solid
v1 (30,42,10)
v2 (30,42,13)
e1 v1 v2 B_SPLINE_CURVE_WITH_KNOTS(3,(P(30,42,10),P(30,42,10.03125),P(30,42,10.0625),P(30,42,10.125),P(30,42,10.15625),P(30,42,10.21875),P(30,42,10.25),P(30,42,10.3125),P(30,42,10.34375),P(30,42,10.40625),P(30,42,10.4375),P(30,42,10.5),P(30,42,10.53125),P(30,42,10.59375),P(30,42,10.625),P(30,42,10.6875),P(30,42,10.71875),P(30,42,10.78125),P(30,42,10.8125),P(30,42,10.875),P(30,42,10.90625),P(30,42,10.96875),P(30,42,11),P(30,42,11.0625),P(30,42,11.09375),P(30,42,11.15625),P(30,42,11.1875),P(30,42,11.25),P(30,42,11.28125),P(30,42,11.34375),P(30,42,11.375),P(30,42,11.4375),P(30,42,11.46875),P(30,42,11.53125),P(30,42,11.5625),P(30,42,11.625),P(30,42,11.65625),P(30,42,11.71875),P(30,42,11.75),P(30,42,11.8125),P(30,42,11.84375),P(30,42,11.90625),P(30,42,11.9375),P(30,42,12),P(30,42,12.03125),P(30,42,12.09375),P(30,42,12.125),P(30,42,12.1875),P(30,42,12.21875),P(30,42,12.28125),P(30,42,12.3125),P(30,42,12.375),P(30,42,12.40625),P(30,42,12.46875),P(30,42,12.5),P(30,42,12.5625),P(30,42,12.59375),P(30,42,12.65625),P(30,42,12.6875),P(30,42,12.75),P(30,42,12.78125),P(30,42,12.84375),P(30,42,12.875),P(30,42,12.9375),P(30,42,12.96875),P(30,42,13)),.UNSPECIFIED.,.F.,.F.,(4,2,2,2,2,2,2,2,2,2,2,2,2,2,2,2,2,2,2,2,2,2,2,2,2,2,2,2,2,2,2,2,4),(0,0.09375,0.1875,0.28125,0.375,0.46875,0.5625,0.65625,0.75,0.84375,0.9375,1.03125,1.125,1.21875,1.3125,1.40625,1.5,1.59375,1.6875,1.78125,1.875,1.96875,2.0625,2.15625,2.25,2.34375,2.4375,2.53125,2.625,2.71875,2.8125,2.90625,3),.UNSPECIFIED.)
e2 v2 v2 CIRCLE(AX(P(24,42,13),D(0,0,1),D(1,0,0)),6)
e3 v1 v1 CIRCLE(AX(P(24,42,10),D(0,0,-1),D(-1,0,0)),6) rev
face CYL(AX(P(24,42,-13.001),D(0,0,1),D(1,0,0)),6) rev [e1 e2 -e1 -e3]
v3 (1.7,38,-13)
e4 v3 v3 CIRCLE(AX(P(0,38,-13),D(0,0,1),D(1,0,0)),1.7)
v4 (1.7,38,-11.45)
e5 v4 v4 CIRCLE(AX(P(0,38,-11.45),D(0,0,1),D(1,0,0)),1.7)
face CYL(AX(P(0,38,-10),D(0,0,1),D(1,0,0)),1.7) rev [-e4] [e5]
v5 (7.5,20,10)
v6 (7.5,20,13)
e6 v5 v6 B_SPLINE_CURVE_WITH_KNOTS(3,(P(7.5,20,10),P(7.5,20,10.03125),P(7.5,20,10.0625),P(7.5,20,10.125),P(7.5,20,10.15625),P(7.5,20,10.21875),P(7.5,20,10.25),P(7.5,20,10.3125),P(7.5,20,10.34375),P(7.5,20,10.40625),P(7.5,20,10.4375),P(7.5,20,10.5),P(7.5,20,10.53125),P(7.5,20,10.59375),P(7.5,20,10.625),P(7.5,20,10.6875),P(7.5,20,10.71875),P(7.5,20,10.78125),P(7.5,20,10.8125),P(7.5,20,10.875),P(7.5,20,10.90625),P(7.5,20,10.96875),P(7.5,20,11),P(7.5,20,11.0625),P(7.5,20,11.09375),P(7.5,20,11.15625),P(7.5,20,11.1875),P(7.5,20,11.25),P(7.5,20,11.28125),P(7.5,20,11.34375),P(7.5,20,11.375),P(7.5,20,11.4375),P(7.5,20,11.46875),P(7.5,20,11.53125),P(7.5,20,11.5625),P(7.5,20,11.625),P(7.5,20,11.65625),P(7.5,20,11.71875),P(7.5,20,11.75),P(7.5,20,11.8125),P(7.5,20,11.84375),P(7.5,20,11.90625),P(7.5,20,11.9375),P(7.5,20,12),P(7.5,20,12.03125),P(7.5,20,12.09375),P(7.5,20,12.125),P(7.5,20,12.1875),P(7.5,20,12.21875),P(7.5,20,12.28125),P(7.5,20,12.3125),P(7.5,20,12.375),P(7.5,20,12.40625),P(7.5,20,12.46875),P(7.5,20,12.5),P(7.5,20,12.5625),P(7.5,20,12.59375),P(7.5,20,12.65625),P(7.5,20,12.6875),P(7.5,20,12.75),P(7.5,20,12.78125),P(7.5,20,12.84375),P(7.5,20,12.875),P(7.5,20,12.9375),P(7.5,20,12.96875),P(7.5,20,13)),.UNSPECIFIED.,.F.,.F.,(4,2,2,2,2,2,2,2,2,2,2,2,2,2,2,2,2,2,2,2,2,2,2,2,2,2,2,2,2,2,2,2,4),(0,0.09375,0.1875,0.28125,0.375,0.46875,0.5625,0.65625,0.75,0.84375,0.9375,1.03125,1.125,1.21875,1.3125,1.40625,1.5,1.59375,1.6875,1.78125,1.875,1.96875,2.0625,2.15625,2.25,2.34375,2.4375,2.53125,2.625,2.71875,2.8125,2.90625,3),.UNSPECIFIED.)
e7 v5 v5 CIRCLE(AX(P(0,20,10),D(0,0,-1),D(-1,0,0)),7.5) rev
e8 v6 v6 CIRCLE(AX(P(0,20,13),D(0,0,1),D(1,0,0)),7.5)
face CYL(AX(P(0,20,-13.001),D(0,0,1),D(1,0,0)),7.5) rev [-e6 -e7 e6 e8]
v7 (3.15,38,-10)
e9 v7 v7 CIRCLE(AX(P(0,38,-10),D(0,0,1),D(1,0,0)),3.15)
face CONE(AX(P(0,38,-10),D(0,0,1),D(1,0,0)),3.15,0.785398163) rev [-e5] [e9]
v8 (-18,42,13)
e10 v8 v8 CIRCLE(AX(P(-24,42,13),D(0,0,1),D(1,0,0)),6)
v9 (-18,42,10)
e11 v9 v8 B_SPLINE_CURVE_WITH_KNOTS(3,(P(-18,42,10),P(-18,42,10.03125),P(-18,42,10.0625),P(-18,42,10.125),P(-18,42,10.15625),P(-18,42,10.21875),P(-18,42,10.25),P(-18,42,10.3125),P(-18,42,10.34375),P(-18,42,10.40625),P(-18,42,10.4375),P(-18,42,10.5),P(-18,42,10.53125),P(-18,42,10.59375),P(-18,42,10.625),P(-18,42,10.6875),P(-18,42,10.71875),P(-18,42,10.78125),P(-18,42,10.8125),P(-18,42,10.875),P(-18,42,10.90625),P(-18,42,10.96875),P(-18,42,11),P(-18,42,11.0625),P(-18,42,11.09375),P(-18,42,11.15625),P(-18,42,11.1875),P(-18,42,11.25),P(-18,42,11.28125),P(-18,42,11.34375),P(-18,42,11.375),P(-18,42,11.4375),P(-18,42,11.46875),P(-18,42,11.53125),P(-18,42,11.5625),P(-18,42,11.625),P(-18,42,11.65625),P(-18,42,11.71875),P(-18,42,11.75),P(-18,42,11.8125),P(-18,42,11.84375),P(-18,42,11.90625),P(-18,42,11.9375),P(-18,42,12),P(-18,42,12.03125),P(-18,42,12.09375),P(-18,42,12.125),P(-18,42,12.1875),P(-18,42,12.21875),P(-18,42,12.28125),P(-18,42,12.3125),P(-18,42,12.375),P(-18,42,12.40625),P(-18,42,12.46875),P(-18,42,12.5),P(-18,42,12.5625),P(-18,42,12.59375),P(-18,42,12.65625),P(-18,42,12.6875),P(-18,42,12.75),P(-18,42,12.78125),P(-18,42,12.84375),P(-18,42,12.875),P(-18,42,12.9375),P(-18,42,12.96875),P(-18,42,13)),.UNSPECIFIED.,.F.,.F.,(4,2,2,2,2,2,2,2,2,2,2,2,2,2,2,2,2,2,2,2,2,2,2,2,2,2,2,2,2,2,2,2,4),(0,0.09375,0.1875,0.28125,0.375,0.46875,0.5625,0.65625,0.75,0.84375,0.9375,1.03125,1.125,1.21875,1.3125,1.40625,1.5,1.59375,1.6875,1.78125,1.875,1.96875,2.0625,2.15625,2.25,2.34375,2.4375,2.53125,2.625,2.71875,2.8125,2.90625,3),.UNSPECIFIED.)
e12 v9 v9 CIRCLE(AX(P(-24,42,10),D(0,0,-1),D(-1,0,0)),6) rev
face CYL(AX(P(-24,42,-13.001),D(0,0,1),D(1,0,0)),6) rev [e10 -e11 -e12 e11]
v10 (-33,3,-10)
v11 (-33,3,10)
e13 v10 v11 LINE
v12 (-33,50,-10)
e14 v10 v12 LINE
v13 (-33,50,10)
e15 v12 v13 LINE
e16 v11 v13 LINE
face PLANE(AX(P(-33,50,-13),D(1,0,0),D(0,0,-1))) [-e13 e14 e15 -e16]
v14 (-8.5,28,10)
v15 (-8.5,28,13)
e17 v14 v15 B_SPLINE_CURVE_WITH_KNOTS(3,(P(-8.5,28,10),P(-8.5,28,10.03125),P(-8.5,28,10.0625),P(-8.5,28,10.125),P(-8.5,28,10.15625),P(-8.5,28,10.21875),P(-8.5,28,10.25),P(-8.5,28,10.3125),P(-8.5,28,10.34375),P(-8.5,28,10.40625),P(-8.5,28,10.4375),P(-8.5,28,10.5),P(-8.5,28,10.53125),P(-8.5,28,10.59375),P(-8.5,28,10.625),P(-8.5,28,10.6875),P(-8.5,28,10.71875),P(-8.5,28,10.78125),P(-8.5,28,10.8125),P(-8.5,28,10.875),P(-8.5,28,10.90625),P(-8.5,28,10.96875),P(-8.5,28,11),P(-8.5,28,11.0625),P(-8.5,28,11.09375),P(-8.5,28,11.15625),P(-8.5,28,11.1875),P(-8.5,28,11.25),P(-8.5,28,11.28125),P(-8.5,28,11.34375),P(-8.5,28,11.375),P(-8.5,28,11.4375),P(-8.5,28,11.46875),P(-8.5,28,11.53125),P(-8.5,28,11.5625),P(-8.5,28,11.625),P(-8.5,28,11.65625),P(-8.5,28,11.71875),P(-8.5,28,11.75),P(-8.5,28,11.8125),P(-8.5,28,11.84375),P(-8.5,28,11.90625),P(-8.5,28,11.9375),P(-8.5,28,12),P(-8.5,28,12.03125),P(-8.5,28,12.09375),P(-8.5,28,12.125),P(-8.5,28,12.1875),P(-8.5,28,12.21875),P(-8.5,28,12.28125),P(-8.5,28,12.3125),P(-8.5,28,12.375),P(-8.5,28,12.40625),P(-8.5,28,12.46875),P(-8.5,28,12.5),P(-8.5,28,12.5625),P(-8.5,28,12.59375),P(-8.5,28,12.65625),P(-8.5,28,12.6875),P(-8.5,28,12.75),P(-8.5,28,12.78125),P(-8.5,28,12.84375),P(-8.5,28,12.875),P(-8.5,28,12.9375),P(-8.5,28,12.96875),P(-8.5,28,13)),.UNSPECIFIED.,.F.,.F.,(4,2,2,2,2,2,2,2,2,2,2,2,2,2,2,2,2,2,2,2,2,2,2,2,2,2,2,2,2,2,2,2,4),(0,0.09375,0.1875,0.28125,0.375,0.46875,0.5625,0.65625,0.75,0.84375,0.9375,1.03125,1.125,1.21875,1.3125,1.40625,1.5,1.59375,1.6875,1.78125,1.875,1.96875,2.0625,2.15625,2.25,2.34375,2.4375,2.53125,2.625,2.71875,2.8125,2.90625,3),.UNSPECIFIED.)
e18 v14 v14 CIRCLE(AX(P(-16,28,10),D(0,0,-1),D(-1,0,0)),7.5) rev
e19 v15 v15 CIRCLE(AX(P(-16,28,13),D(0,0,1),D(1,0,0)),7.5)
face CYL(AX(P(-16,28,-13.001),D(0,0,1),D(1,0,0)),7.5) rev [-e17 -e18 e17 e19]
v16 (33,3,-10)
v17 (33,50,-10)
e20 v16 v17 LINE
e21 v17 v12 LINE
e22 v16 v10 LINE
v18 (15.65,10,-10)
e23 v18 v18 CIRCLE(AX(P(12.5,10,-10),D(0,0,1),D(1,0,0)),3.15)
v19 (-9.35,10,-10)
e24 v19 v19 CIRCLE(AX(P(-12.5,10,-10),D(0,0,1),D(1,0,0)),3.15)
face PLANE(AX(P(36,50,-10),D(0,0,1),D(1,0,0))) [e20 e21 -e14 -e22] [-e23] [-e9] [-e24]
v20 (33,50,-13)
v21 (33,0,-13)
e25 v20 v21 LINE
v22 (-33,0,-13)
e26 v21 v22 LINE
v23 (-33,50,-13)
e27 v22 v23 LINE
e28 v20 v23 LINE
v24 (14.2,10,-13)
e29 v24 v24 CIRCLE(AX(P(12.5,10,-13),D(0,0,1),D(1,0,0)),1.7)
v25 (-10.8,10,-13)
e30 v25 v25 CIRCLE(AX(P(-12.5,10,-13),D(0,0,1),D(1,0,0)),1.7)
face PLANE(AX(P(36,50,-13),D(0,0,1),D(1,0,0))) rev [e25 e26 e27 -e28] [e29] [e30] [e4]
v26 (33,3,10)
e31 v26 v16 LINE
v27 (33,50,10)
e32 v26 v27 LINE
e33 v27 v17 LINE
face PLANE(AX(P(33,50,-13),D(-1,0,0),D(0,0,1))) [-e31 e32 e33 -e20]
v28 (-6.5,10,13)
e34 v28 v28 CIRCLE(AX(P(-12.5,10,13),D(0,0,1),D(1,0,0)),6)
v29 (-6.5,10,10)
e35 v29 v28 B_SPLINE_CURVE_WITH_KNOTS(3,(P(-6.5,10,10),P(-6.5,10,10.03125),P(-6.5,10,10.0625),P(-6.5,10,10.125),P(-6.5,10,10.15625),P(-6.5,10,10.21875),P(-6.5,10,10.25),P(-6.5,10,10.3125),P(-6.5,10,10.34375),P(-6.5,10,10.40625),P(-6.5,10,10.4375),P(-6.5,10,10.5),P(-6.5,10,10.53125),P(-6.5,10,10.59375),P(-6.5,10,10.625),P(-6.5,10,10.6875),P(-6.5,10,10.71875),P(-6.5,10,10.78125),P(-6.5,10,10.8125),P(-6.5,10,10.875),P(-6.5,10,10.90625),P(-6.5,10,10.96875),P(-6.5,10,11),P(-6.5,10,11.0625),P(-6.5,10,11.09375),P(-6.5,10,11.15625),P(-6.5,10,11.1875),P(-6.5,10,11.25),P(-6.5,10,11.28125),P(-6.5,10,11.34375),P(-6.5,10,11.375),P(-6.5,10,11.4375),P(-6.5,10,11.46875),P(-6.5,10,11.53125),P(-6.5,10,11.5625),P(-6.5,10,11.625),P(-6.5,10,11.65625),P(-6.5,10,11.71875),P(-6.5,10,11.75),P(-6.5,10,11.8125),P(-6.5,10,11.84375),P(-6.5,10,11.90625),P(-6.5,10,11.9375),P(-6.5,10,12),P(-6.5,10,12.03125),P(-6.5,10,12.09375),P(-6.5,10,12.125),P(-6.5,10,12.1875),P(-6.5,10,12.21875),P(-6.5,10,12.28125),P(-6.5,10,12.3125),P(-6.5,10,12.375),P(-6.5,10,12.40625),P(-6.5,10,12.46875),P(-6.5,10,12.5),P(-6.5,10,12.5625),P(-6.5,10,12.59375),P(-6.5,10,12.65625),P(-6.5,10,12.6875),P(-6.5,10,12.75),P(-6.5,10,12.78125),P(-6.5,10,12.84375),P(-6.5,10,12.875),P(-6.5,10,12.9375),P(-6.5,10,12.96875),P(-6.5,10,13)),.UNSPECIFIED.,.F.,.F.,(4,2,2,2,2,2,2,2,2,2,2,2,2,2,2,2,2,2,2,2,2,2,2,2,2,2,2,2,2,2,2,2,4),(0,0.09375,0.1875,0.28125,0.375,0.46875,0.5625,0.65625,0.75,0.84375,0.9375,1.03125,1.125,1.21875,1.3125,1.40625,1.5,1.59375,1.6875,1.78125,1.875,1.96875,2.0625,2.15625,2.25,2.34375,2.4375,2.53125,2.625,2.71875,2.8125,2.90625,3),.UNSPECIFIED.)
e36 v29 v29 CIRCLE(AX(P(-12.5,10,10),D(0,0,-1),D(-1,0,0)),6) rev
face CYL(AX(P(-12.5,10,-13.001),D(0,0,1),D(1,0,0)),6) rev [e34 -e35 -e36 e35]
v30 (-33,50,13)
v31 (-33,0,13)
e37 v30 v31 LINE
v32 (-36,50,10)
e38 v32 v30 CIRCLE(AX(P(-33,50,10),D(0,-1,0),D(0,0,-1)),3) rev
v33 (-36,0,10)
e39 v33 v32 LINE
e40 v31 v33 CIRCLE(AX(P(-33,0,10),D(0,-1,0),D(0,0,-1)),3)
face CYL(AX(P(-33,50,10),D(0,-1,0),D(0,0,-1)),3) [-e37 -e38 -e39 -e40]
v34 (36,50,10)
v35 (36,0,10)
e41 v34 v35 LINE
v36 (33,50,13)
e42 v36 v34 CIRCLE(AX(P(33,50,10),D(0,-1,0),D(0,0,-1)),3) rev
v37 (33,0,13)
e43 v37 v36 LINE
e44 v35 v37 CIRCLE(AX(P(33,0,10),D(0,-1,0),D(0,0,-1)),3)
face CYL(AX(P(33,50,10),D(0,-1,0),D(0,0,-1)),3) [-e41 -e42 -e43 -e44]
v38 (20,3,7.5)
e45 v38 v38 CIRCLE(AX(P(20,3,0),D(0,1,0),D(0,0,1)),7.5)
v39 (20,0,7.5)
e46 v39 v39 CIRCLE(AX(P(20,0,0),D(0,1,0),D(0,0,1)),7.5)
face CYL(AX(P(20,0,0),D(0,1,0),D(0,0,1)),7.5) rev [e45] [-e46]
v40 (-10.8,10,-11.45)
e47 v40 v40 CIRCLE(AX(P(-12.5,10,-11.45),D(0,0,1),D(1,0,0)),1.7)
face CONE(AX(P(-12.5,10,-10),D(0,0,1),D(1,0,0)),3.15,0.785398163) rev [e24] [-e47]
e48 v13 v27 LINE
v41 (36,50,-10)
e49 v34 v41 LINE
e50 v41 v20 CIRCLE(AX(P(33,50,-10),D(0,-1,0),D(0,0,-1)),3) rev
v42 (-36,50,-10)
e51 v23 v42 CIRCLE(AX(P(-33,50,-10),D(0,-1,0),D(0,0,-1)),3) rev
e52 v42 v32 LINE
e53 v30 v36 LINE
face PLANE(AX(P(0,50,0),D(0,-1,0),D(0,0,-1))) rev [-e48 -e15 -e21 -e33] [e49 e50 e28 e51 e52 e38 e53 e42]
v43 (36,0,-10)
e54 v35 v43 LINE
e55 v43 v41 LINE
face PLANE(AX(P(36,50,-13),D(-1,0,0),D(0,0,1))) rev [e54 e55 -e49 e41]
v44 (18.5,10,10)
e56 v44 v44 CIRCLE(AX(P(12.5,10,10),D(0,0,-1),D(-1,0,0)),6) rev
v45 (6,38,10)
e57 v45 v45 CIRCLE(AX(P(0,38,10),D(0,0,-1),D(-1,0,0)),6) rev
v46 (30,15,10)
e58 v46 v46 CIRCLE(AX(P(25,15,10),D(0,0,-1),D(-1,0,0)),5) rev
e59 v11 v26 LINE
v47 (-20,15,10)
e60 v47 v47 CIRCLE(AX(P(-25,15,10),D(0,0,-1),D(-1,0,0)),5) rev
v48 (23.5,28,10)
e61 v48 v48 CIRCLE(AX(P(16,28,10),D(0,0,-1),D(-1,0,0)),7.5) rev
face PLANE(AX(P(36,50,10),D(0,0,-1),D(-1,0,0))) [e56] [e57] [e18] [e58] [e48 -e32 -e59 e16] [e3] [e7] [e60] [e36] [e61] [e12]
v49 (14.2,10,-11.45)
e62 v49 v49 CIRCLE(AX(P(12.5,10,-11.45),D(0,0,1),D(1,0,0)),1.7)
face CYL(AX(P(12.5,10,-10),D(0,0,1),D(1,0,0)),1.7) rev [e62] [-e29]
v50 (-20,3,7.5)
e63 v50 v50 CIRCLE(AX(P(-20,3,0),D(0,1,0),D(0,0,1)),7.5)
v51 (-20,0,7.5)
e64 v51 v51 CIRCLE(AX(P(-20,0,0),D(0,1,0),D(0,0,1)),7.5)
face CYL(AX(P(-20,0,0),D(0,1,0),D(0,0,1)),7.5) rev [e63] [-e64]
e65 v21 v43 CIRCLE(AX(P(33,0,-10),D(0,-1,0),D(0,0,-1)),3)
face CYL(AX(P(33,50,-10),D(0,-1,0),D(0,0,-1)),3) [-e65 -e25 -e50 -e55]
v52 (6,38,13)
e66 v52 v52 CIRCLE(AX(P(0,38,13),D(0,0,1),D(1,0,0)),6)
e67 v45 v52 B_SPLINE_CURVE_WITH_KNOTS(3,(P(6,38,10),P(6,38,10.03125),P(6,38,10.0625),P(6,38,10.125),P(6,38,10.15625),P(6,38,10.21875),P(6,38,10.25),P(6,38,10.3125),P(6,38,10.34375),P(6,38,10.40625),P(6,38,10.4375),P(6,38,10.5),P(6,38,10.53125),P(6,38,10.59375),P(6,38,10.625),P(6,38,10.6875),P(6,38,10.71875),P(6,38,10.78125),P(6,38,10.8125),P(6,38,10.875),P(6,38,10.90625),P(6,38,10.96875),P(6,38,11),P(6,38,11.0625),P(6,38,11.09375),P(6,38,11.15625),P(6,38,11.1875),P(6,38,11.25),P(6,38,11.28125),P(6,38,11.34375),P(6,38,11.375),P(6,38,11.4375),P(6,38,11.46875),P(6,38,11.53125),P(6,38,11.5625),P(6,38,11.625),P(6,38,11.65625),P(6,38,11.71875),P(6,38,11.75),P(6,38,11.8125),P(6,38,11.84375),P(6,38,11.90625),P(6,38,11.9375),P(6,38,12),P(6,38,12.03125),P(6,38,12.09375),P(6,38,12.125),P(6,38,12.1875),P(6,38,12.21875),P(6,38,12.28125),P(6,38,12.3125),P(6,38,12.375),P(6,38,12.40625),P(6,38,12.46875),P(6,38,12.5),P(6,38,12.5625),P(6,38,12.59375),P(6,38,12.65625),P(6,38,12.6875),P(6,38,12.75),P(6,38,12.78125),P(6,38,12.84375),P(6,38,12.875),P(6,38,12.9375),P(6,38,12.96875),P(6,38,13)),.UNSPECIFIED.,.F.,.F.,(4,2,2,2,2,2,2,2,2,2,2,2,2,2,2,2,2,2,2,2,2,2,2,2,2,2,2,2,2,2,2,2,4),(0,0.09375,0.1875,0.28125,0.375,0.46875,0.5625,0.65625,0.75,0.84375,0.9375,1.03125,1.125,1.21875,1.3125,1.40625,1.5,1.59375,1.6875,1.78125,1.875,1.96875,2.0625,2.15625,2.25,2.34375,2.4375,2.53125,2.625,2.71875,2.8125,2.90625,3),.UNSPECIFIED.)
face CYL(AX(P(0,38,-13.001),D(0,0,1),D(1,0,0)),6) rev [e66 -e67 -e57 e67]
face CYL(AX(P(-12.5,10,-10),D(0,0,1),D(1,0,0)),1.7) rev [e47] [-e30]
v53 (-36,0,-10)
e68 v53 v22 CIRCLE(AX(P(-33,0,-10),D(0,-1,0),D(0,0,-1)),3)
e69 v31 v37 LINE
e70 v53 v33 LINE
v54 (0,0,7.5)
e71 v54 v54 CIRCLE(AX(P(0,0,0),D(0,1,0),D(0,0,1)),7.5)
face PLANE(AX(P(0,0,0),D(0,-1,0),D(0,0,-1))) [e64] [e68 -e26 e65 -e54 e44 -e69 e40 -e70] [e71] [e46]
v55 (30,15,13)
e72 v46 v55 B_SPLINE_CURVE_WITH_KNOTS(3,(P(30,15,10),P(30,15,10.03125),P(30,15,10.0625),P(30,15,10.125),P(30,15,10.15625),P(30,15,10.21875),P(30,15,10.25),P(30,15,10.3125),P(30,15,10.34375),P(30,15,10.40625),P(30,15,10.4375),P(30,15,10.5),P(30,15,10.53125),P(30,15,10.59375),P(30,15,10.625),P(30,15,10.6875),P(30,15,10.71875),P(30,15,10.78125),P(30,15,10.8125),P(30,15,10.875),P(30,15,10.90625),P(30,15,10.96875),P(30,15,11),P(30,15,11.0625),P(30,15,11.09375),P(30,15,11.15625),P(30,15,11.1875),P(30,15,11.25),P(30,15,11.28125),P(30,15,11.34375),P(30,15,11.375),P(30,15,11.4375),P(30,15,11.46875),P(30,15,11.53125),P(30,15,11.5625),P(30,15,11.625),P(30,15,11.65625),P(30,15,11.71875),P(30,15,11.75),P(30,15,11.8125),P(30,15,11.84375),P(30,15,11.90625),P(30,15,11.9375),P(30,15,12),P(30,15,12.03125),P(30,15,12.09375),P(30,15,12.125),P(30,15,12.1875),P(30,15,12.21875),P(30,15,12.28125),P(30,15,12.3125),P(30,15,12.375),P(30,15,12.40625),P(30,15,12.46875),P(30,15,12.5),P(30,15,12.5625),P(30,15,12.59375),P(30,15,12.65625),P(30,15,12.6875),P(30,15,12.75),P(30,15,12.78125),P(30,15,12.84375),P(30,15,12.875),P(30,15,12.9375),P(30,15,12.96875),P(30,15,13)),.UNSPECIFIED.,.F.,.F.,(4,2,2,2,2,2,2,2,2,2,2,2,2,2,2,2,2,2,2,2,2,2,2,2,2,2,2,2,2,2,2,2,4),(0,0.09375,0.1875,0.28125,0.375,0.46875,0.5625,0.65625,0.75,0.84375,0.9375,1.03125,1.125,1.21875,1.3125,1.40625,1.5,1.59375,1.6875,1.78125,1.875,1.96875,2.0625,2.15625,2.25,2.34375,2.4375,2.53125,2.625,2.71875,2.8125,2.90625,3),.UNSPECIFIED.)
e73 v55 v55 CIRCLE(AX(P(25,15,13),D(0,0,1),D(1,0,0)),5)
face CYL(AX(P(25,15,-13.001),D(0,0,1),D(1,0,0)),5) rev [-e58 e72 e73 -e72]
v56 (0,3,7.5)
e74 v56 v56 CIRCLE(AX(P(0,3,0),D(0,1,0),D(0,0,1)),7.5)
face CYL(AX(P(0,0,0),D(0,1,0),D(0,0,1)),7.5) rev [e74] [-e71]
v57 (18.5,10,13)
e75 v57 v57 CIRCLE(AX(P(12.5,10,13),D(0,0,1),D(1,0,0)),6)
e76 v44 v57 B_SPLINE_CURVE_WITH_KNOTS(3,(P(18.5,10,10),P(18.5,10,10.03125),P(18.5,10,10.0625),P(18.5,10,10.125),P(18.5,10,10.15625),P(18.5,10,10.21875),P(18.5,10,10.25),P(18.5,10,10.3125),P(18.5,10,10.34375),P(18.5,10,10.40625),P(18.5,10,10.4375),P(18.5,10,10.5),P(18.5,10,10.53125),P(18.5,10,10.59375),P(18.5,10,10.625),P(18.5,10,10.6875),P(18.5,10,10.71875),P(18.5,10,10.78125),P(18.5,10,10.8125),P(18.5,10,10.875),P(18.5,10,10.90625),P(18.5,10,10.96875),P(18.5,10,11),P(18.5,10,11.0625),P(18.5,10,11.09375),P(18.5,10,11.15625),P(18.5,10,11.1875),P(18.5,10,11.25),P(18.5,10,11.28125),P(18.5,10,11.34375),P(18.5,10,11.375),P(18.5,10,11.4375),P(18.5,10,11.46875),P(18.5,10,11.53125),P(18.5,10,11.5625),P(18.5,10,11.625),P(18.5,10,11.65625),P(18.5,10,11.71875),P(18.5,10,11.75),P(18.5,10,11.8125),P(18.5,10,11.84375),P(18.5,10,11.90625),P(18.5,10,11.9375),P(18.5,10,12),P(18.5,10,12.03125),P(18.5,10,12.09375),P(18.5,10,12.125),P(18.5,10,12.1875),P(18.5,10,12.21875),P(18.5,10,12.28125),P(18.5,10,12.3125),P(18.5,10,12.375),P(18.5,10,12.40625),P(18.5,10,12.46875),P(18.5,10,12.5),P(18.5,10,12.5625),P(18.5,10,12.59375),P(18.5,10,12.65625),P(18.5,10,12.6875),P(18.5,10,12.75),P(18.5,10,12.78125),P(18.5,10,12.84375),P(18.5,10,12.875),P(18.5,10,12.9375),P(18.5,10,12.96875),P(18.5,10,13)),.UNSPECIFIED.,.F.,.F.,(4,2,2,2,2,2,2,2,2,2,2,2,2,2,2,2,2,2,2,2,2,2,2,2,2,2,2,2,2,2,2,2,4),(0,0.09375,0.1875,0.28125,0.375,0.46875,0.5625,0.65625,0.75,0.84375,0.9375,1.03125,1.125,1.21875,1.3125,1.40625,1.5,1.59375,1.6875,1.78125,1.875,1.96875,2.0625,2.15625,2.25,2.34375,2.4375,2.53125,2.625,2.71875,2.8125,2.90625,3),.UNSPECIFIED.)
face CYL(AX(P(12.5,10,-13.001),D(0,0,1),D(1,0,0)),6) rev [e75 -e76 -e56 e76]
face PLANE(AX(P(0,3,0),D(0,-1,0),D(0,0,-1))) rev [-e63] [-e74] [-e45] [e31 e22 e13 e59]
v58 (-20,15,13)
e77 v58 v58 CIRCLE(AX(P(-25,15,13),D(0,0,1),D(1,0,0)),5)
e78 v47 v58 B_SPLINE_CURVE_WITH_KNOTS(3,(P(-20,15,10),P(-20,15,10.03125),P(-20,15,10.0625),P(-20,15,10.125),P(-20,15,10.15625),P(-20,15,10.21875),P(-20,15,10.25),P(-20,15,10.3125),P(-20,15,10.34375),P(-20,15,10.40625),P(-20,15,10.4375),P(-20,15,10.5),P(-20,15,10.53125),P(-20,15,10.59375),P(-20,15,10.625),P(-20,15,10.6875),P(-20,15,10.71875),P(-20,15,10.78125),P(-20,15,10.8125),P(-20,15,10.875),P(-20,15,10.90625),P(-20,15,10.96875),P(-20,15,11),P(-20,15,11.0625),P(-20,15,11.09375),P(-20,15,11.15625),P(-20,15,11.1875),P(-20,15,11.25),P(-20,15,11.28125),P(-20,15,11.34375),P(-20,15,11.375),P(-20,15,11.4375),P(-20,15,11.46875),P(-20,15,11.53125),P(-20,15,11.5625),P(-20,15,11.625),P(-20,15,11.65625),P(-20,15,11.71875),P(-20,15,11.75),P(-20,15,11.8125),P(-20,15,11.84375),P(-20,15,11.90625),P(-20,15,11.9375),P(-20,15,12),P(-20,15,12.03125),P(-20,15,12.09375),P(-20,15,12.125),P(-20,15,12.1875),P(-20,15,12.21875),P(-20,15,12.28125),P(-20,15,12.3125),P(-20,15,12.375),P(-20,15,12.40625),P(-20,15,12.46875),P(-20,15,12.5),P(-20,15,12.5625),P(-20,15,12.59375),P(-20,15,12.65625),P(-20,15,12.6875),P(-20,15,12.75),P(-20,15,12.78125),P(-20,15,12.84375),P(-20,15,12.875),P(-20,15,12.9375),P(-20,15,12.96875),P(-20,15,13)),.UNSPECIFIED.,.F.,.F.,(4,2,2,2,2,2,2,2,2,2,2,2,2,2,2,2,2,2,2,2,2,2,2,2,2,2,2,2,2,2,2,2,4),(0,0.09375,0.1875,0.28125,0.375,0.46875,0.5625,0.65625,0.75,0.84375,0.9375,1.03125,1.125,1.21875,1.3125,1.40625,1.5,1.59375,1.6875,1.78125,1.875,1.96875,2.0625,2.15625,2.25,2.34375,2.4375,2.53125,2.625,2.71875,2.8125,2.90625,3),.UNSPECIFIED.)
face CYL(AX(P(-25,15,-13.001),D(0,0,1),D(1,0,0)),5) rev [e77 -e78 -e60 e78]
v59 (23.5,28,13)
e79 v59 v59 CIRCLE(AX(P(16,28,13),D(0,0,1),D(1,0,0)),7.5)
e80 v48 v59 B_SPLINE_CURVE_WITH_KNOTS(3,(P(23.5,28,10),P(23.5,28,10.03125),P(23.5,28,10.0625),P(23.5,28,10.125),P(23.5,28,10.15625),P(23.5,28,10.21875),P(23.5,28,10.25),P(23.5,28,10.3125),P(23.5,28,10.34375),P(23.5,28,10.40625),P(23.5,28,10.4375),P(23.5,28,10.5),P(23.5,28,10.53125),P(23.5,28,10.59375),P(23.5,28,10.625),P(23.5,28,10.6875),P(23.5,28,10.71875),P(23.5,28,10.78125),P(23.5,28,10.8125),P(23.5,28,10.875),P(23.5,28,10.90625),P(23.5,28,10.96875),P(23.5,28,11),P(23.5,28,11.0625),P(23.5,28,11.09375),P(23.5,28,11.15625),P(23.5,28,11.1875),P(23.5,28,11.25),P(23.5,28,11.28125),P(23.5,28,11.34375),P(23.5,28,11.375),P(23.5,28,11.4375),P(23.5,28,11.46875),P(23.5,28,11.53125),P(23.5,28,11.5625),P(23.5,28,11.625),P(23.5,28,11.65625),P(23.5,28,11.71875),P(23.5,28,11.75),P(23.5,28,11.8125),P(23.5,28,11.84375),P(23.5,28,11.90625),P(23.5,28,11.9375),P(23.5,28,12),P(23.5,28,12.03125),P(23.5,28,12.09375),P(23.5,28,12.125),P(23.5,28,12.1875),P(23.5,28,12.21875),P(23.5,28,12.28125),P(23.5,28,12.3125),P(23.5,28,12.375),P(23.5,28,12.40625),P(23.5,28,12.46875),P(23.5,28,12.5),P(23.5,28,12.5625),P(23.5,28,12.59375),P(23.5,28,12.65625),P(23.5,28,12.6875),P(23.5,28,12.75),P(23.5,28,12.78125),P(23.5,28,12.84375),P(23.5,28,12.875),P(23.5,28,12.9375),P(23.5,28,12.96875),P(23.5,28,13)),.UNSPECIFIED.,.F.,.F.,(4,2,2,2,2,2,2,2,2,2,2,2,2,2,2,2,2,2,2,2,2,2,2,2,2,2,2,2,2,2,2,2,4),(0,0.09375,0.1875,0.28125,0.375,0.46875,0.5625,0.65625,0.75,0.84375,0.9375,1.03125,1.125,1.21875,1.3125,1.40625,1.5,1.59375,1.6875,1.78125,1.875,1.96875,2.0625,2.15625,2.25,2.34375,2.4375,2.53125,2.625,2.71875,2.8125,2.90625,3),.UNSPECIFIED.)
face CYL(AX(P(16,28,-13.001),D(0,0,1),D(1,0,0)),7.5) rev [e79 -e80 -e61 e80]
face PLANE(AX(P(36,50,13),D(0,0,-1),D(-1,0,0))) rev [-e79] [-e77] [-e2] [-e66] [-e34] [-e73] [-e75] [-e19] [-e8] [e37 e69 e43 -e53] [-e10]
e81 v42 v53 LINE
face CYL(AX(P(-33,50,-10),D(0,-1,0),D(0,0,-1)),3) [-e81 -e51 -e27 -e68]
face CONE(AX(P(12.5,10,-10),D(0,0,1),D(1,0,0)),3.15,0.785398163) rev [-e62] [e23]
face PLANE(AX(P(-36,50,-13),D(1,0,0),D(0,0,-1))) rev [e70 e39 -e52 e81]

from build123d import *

# Parameters (mm, degrees)
SKETCH1_W                                    = 72
SKETCH1_H                                    = 26
BOSS_EXTRUDE1_DEPTH                          = 50
FILLET1_R                                    = 3
SHELL1_START                                 = -33
SHELL1_OUTLINE_W                             = 47
SHELL1_OUTLINE_H                             = 20
SHELL1_DEPTH                                 = 66
SKETCH2_R                                    = 7.5
CUT_EXTRUDE1_DEPTH                           = 61.613529843
CSK_FOR_M3_COUNTERSUNK_FLAT_HEAD_SCR_2_COUNT = 2
CSK_FOR_M3_COUNTERSUNK_FLAT_HEAD_SCR_2_PITCH = 30.663496213
CSK_FOR_M3_COUNTERSUNK_FLAT_HEAD_SCR_3_COUNT = 2
CSK_FOR_M3_COUNTERSUNK_FLAT_HEAD_SCR_3_PITCH = 30.663496213
CUT_EXTRUDE2_REACH                           = 68.873
SKETCH6_R                                    = 6
SKETCH6_R_2                                  = 7.5
SKETCH6_R_3                                  = 5


# Read off the part's stored shape, not the designer's step: Shell1
with BuildPart() as part:
    # Sketch1 → Boss-Extrude1 (new body)
    with BuildSketch(Plane(origin=(0, 0, 0), x_dir=(1, 0, 0), z_dir=(0, 1, 0))):
        Rectangle(SKETCH1_W, SKETCH1_H)
    extrude(amount=BOSS_EXTRUDE1_DEPTH)

    # Fillet1
    fillet1_edges = [part.edges().sort_by_distance(p)[0] for p in [
        (-36, 25, -13),
        (36, 25, -13),
        (36, 25, 13),
        (-36, 25, 13),
    ]]
    fillet(fillet1_edges, radius=FILLET1_R)

    # Shell1 outline → Shell1 (cut)
    with BuildSketch(Plane.YZ.offset(SHELL1_START)):
        with Locations((26.5, 0)):
            Rectangle(SHELL1_OUTLINE_W, SHELL1_OUTLINE_H)
    extrude(amount=SHELL1_DEPTH, mode=Mode.SUBTRACT)

    # Sketch2 → Cut-Extrude1 (cut, through all)
    with BuildSketch(Plane(origin=(0, 3, 0), x_dir=(1, 0, 0), z_dir=(0, 1, 0))):
        with Locations(Location((0, 0, 0), (0, 0, 270))):
            Circle(SKETCH2_R)
        with Locations(Location((-20, 0, 0), (0, 0, 270))):
            Circle(SKETCH2_R)
        with Locations(Location((20, 0, 0), (0, 0, 270))):
            Circle(SKETCH2_R)
    extrude(amount=-CUT_EXTRUDE1_DEPTH, mode=Mode.SUBTRACT)

    # Sketch4 → CSK for M3 Countersunk Flat Head Screw1 (revolve, cut)
    with BuildSketch(Plane(origin=(0, 38, -10), x_dir=(0, -1, 0), z_dir=(1, 0, 0))):
        Polygon((0, 0), (0, 3), (1.7, 3), (1.7, 1.45), (3.15, 0), align=None)
    csk_for_m3_countersunk_flat_head_screw1 = revolve(axis=Axis((0, 38, -3.65), (0, 0, -1)), mode=Mode.SUBTRACT)

    # CSK for M3 Countersunk Flat Head Scr 2: CSK for M3 Countersunk Flat Head Screw1 ×2
    with Locations(*[Vector(-0.4076508403738889, -0.9131378824375114, 0) * (i * CSK_FOR_M3_COUNTERSUNK_FLAT_HEAD_SCR_2_PITCH) for i in range(1, CSK_FOR_M3_COUNTERSUNK_FLAT_HEAD_SCR_2_COUNT)]):
        add(csk_for_m3_countersunk_flat_head_screw1, mode=Mode.SUBTRACT)

    # CSK for M3 Countersunk Flat Head Scr 3: CSK for M3 Countersunk Flat Head Screw1 ×2
    with Locations(*[Vector(0.4076508403738889, -0.9131378824375114, 0) * (i * CSK_FOR_M3_COUNTERSUNK_FLAT_HEAD_SCR_3_PITCH) for i in range(1, CSK_FOR_M3_COUNTERSUNK_FLAT_HEAD_SCR_3_COUNT)]):
        add(csk_for_m3_countersunk_flat_head_screw1, mode=Mode.SUBTRACT)

    # Sketch6 → Cut-Extrude2 (cut, up to next)
    with BuildSketch(Plane.XY.offset(13), mode=Mode.PRIVATE) as cut_extrude2_sk1:
        with Locations((0, 38)):
            Circle(SKETCH6_R)
    cut_extrude2_tool1 = extrude(cut_extrude2_sk1.sketch, amount=-CUT_EXTRUDE2_REACH, mode=Mode.PRIVATE) & part.part
    # Sketch6 → Cut-Extrude2 (cut, up to next)
    with BuildSketch(Plane.XY.offset(13), mode=Mode.PRIVATE) as cut_extrude2_sk2:
        with Locations((-12.5, 10)):
            Circle(SKETCH6_R)
    cut_extrude2_tool2 = extrude(cut_extrude2_sk2.sketch, amount=-CUT_EXTRUDE2_REACH, mode=Mode.PRIVATE) & part.part
    # Sketch6 → Cut-Extrude2 (cut, up to next)
    with BuildSketch(Plane.XY.offset(13), mode=Mode.PRIVATE) as cut_extrude2_sk3:
        with Locations((12.5, 10)):
            Circle(SKETCH6_R)
    cut_extrude2_tool3 = extrude(cut_extrude2_sk3.sketch, amount=-CUT_EXTRUDE2_REACH, mode=Mode.PRIVATE) & part.part
    # Sketch6 → Cut-Extrude2 (cut, up to next)
    with BuildSketch(Plane.XY.offset(13), mode=Mode.PRIVATE) as cut_extrude2_sk4:
        with Locations((0, 20)):
            Circle(SKETCH6_R_2)
    cut_extrude2_tool4 = extrude(cut_extrude2_sk4.sketch, amount=-CUT_EXTRUDE2_REACH, mode=Mode.PRIVATE) & part.part
    # Sketch6 → Cut-Extrude2 (cut, up to next)
    with BuildSketch(Plane.XY.offset(13), mode=Mode.PRIVATE) as cut_extrude2_sk5:
        with Locations((24, 42)):
            Circle(SKETCH6_R)
    cut_extrude2_tool5 = extrude(cut_extrude2_sk5.sketch, amount=-CUT_EXTRUDE2_REACH, mode=Mode.PRIVATE) & part.part
    # Sketch6 → Cut-Extrude2 (cut, up to next)
    with BuildSketch(Plane.XY.offset(13), mode=Mode.PRIVATE) as cut_extrude2_sk6:
        with Locations((16, 28)):
            Circle(SKETCH6_R_2)
    cut_extrude2_tool6 = extrude(cut_extrude2_sk6.sketch, amount=-CUT_EXTRUDE2_REACH, mode=Mode.PRIVATE) & part.part
    # Sketch6 → Cut-Extrude2 (cut, up to next)
    with BuildSketch(Plane.XY.offset(13), mode=Mode.PRIVATE) as cut_extrude2_sk7:
        with Locations((-16, 28)):
            Circle(SKETCH6_R_2)
    cut_extrude2_tool7 = extrude(cut_extrude2_sk7.sketch, amount=-CUT_EXTRUDE2_REACH, mode=Mode.PRIVATE) & part.part
    # Sketch6 → Cut-Extrude2 (cut, up to next)
    with BuildSketch(Plane.XY.offset(13), mode=Mode.PRIVATE) as cut_extrude2_sk8:
        with Locations((-24, 42)):
            Circle(SKETCH6_R)
    cut_extrude2_tool8 = extrude(cut_extrude2_sk8.sketch, amount=-CUT_EXTRUDE2_REACH, mode=Mode.PRIVATE) & part.part
    # Sketch6 → Cut-Extrude2 (cut, up to next)
    with BuildSketch(Plane.XY.offset(13), mode=Mode.PRIVATE) as cut_extrude2_sk9:
        with Locations((25, 15)):
            Circle(SKETCH6_R_3)
    cut_extrude2_tool9 = extrude(cut_extrude2_sk9.sketch, amount=-CUT_EXTRUDE2_REACH, mode=Mode.PRIVATE) & part.part
    # Sketch6 → Cut-Extrude2 (cut, up to next)
    with BuildSketch(Plane.XY.offset(13), mode=Mode.PRIVATE) as cut_extrude2_sk10:
        with Locations((-25, 15)):
            Circle(SKETCH6_R_3)
    cut_extrude2_tool10 = extrude(cut_extrude2_sk10.sketch, amount=-CUT_EXTRUDE2_REACH, mode=Mode.PRIVATE) & part.part
    add(cut_extrude2_tool1.solids().sort_by_distance((0, 38, 13))[0], mode=Mode.SUBTRACT)
    add(cut_extrude2_tool2.solids().sort_by_distance((-12.5, 10, 13))[0], mode=Mode.SUBTRACT)
    add(cut_extrude2_tool3.solids().sort_by_distance((12.5, 10, 13))[0], mode=Mode.SUBTRACT)
    add(cut_extrude2_tool4.solids().sort_by_distance((0, 20, 13))[0], mode=Mode.SUBTRACT)
    add(cut_extrude2_tool5.solids().sort_by_distance((24, 42, 13))[0], mode=Mode.SUBTRACT)
    add(cut_extrude2_tool6.solids().sort_by_distance((16, 28, 13))[0], mode=Mode.SUBTRACT)
    add(cut_extrude2_tool7.solids().sort_by_distance((-16, 28, 13))[0], mode=Mode.SUBTRACT)
    add(cut_extrude2_tool8.solids().sort_by_distance((-24, 42, 13))[0], mode=Mode.SUBTRACT)
    add(cut_extrude2_tool9.solids().sort_by_distance((25, 15, 13))[0], mode=Mode.SUBTRACT)
    add(cut_extrude2_tool10.solids().sort_by_distance((-25, 15, 13))[0], mode=Mode.SUBTRACT)


solid = part.part
